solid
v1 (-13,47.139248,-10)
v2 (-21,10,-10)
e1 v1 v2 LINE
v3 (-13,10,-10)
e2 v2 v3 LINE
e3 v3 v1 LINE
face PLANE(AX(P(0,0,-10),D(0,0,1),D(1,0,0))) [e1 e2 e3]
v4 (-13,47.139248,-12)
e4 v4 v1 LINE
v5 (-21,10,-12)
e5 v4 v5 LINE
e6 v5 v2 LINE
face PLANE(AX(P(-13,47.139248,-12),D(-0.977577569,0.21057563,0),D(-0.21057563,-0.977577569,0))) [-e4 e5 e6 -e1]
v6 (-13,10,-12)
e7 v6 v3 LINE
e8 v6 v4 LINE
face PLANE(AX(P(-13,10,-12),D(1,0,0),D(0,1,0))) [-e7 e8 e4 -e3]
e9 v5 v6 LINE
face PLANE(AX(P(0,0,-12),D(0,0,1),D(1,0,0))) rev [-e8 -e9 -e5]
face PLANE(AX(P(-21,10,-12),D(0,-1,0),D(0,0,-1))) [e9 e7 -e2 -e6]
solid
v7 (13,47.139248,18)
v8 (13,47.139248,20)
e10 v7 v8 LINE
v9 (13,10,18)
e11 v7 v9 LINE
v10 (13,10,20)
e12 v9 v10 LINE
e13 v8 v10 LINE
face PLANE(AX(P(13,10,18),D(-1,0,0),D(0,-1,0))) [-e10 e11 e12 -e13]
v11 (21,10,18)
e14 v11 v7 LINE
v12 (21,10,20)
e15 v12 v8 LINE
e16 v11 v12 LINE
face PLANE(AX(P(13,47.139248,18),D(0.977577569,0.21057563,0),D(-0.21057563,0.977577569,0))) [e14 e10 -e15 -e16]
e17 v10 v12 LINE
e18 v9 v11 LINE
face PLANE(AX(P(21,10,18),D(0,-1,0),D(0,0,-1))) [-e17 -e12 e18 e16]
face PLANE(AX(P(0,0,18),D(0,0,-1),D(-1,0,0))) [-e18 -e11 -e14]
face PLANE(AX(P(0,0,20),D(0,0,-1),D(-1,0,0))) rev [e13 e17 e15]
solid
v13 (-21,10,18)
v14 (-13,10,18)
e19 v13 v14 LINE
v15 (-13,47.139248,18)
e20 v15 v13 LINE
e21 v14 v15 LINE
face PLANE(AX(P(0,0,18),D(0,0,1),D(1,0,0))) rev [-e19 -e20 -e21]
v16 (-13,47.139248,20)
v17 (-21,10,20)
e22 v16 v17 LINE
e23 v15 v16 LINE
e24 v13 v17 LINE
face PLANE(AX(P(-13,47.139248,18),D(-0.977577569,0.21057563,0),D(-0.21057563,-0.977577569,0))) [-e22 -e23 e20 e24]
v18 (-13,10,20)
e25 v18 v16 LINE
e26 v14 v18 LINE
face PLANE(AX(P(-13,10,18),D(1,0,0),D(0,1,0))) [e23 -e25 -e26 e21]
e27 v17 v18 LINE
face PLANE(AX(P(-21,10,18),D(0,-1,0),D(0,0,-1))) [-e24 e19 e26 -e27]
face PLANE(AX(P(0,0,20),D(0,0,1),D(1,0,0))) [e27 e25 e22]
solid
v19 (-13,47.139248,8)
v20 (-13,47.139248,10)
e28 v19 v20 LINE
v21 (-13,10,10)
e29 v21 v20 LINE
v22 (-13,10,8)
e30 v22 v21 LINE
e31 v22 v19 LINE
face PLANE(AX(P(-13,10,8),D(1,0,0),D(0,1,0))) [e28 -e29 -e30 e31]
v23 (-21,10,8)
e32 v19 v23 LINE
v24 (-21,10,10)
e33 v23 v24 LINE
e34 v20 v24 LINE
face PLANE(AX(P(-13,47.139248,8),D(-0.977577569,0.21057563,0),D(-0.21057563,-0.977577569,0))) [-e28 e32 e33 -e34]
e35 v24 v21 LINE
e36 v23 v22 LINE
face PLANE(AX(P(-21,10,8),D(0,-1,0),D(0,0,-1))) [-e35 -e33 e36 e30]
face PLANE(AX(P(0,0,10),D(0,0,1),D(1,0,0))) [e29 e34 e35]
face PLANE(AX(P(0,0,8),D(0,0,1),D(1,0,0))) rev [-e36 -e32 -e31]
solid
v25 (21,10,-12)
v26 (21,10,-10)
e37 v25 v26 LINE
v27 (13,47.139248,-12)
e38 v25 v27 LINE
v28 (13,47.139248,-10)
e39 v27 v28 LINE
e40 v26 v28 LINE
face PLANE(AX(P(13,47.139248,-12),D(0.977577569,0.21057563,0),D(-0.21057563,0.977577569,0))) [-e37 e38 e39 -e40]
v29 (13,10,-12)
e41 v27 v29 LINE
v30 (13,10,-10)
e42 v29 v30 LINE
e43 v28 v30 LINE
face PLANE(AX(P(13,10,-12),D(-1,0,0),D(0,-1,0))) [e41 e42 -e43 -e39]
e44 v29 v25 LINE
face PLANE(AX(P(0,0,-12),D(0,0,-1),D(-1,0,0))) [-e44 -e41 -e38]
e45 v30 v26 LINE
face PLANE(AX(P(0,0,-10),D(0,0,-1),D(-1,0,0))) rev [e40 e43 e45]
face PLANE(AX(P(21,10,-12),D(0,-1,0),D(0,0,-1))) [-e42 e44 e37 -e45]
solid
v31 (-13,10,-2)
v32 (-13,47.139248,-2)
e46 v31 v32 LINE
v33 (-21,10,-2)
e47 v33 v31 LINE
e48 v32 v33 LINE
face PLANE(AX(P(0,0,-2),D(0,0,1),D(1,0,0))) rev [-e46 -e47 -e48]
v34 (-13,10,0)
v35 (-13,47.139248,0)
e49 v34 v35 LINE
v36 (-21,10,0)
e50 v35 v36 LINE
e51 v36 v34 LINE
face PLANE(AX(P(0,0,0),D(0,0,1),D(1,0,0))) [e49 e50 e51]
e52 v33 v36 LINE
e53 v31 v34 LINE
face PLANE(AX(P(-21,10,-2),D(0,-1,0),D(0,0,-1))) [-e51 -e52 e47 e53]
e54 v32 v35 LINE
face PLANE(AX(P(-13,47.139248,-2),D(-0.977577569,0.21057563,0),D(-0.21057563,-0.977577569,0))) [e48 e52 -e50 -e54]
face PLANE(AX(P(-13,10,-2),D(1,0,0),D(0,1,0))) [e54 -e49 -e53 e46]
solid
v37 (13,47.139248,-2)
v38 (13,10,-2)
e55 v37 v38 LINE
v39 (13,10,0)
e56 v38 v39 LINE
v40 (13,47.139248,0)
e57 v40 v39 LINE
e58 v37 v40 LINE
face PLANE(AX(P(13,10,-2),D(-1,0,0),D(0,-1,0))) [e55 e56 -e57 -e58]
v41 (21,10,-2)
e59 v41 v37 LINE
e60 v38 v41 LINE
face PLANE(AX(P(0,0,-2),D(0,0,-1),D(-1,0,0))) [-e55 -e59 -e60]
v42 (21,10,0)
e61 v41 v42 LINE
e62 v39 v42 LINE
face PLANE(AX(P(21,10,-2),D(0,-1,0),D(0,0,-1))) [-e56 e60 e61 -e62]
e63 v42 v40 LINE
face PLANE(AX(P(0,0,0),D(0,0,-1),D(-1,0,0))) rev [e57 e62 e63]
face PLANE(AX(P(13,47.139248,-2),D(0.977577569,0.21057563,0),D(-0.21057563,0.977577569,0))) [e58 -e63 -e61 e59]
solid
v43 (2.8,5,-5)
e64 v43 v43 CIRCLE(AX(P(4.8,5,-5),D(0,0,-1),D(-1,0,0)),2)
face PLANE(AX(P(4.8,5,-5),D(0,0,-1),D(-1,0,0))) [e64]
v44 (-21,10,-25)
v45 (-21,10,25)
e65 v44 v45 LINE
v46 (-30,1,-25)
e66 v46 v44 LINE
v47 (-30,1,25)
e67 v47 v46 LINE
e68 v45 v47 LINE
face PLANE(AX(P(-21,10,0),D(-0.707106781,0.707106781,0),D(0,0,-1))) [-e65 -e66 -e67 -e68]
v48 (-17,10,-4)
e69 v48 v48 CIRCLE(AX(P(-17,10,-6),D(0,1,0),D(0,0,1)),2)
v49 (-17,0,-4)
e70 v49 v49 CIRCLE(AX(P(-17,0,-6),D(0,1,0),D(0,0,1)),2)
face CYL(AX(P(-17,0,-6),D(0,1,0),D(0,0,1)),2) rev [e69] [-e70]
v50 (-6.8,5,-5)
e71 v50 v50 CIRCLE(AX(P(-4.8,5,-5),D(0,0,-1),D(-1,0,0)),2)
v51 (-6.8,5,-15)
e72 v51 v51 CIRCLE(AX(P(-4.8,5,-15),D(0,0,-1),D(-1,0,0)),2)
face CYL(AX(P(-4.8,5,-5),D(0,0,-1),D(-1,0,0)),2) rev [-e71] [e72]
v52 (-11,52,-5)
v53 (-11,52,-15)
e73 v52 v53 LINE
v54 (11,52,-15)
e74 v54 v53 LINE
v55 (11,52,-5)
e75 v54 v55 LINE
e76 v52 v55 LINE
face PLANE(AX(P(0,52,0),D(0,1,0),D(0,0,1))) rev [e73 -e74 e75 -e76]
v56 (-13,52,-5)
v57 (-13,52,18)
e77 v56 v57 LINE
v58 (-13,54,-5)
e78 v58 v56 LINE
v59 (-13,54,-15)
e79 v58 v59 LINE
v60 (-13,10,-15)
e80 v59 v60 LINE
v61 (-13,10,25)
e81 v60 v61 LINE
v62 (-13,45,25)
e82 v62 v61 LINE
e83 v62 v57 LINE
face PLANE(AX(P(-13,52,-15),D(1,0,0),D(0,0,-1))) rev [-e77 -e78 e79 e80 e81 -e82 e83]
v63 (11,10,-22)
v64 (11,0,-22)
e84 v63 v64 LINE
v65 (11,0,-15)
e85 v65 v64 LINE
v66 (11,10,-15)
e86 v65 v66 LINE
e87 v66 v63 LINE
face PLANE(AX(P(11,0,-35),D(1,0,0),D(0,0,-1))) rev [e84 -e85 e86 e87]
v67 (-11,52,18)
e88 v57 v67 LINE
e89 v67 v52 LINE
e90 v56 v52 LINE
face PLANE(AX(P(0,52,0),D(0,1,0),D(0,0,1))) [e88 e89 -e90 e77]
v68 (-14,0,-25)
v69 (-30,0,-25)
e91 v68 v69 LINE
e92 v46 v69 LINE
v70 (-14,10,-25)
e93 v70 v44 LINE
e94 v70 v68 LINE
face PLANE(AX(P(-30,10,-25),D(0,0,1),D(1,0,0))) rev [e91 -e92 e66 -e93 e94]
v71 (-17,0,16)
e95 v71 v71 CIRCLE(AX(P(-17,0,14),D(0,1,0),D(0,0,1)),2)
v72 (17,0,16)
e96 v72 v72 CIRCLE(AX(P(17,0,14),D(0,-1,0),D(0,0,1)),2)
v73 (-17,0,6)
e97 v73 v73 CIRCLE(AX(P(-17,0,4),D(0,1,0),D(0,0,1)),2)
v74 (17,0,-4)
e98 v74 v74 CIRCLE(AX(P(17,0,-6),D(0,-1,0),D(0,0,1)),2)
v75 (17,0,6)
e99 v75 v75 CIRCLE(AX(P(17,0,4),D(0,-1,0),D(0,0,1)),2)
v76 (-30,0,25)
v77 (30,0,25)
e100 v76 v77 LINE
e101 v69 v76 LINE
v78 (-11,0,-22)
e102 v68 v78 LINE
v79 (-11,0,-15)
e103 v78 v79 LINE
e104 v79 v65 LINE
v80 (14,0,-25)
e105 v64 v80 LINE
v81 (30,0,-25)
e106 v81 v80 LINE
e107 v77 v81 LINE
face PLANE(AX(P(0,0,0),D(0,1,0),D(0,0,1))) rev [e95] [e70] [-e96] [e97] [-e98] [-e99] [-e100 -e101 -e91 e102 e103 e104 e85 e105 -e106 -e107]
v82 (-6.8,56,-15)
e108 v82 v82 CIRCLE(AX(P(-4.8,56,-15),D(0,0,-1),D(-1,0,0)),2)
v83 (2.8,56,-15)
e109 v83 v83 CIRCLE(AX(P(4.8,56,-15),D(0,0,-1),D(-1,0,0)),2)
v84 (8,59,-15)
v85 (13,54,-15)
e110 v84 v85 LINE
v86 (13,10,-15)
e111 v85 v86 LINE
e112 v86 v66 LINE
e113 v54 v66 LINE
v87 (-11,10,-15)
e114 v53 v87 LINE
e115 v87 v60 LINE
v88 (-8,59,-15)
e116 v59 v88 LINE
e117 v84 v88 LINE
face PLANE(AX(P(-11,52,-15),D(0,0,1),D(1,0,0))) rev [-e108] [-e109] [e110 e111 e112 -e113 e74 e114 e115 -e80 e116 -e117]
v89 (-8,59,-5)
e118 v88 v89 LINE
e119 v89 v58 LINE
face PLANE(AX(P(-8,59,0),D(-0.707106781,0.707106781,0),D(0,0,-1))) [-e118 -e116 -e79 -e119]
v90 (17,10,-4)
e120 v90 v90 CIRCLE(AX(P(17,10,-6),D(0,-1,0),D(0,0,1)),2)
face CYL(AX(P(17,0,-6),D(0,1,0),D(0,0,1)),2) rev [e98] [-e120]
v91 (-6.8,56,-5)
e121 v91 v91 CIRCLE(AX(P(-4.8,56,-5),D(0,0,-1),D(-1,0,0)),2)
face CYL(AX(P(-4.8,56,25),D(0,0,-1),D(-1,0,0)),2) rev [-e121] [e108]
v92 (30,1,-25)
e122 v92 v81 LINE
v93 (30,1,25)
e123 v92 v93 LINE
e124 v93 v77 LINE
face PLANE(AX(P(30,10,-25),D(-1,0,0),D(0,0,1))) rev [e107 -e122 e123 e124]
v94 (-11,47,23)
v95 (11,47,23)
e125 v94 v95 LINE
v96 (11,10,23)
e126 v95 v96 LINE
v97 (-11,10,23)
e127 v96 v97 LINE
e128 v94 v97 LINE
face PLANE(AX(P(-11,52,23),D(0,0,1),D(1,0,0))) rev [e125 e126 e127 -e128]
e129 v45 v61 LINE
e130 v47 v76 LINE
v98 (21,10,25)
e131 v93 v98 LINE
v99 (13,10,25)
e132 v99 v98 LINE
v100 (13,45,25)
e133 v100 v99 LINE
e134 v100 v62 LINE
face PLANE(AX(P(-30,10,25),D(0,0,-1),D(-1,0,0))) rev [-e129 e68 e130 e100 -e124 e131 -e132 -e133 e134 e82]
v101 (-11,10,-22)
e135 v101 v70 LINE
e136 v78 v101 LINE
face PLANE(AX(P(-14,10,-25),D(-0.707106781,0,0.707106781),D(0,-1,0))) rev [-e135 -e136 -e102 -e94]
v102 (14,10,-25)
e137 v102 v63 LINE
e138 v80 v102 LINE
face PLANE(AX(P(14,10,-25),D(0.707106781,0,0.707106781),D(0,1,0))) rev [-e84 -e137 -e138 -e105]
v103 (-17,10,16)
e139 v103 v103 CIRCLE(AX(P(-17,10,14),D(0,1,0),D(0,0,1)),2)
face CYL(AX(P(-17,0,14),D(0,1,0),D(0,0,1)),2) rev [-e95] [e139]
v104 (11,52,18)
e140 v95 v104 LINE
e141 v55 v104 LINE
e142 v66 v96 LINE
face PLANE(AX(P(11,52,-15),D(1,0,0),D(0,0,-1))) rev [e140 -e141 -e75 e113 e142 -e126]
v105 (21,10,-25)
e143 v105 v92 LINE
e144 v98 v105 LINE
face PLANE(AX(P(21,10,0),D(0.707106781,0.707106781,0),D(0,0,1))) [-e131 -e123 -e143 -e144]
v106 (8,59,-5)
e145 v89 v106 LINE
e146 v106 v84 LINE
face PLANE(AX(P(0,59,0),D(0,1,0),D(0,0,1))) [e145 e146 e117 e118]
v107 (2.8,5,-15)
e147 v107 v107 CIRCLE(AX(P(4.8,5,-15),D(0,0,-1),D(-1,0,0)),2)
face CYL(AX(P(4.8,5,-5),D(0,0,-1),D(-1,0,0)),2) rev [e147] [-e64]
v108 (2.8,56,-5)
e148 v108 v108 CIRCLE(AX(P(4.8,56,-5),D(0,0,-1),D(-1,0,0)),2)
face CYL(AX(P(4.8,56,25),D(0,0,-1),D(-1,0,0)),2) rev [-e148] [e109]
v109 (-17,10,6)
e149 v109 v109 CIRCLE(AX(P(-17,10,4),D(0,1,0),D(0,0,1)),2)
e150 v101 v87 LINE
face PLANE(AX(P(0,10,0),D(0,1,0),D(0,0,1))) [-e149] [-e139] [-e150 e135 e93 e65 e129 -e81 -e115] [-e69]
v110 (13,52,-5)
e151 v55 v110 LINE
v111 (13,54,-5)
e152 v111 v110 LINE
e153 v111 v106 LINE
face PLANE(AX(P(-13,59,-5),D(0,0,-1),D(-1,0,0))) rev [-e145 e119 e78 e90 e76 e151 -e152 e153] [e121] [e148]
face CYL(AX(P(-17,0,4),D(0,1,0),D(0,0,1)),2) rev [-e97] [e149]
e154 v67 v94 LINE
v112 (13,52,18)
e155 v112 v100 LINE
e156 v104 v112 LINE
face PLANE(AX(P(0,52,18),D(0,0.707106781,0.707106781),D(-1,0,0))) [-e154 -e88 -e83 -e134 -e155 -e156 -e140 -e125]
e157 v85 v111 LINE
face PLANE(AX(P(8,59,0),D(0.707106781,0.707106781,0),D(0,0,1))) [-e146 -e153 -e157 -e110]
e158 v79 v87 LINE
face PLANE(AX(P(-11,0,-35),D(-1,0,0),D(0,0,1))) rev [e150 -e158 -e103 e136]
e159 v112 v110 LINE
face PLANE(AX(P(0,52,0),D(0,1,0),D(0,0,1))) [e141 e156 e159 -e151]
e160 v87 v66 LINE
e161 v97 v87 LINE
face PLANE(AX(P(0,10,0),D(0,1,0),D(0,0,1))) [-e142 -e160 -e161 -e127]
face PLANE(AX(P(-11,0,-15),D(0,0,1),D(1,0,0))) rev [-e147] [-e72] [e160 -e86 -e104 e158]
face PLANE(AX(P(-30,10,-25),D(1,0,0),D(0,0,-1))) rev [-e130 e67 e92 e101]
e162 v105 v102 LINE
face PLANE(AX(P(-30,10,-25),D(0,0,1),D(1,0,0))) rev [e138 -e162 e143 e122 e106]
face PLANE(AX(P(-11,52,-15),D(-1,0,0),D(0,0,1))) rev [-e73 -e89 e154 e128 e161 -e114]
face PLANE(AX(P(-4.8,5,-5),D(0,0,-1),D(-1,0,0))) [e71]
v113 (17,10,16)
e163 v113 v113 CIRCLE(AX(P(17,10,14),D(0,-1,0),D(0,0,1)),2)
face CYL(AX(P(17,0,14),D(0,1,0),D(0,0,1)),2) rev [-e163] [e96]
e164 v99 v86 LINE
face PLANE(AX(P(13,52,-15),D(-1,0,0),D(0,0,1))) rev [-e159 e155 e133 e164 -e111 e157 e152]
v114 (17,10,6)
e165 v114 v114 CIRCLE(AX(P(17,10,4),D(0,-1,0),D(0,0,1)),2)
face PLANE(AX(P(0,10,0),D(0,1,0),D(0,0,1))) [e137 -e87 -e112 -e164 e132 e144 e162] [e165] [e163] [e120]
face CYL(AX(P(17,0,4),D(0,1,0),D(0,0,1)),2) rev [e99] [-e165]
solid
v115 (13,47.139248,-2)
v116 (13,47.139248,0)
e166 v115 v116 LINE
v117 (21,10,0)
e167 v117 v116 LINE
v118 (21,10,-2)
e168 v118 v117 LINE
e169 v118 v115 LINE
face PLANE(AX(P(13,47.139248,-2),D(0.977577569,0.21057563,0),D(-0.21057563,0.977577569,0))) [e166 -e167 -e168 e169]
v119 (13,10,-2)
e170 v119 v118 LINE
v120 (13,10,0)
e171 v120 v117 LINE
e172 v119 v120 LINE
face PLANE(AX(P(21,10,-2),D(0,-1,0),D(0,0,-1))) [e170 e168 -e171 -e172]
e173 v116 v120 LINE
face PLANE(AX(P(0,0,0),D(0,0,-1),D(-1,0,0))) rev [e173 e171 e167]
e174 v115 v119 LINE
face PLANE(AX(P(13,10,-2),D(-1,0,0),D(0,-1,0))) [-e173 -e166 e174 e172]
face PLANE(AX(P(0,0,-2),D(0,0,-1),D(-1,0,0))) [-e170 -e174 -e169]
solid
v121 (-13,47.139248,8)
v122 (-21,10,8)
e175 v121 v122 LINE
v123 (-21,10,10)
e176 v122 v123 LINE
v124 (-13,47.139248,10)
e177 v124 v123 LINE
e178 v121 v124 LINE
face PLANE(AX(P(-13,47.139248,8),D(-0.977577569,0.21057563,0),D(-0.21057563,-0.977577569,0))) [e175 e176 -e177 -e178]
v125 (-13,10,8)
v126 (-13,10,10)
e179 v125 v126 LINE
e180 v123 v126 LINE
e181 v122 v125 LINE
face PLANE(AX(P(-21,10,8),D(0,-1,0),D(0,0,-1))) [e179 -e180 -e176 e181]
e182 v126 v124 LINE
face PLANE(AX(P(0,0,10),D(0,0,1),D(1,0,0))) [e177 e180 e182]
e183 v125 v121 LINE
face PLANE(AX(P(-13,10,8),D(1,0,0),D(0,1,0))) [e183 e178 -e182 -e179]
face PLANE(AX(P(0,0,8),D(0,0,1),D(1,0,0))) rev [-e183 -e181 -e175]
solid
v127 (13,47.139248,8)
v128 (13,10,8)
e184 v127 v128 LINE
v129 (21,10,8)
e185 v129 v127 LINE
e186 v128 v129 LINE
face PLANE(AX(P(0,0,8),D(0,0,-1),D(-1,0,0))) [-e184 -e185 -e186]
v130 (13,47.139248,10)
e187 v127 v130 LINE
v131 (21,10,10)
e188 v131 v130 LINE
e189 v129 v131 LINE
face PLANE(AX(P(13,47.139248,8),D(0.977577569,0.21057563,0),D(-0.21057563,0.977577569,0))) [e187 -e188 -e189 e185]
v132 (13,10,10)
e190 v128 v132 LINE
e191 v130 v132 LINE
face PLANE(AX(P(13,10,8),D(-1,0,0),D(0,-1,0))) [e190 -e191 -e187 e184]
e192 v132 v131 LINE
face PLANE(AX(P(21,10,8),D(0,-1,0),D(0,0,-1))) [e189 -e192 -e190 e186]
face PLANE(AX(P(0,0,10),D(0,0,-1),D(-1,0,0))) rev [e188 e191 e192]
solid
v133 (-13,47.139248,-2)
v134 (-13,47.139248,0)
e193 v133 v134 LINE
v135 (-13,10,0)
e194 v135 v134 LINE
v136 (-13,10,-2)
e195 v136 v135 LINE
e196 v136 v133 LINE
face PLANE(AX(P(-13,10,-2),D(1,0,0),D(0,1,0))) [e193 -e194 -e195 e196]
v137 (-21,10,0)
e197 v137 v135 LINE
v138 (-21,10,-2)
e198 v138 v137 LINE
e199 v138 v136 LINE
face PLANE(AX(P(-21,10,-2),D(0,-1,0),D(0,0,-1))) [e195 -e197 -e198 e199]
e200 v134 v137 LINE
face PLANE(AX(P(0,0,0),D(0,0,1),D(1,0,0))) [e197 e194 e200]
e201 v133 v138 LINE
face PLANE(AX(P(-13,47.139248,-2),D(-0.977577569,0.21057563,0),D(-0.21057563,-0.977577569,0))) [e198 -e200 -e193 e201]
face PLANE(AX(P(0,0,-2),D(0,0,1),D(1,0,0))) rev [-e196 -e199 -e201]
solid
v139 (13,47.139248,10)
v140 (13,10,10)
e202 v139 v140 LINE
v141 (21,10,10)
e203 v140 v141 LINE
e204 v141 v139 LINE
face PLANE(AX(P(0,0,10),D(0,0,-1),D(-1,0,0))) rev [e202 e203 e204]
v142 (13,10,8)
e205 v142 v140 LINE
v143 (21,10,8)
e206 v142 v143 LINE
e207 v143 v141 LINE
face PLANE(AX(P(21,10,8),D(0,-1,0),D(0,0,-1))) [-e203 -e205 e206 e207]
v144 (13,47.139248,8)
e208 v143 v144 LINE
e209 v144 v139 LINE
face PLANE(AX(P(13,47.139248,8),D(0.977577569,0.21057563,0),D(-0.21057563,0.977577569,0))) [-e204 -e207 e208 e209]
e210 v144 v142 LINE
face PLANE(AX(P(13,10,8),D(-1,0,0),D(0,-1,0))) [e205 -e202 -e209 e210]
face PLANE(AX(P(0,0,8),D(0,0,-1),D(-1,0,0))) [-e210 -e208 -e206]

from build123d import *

# Parameters (mm, degrees)
SKETCH1_W                 = 60
SKETCH1_H                 = 50
BOSS_EXTRUDE1_DEPTH       = 10
CHAMFER1_SIZE             = 9
SKETCH2_W                 = 22
SKETCH2_H                 = 20
CUT_EXTRUDE1_DEPTH        = 41.311288741
CHAMFER2_SIZE             = 3
SKETCH3_R                 = 2
CUT_EXTRUDE2_DEPTH        = 10
BOSS_EXTRUDE2_DEPTH       = 42
BOSS_EXTRUDE3_DEPTH       = 2
BOSS_EXTRUDE3_2_DEPTH     = 2
LPATTERN1_START           = 8
LPATTERN1_DEPTH           = 2
LPATTERN1_2_DEPTH         = 2
LPATTERN1_START_2         = 18
LPATTERN1_3_DEPTH         = 2
LPATTERN1_4_DEPTH         = 2
LPATTERN1_5_DEPTH         = 2
LPATTERN1_6_DEPTH         = 2
LPATTERN1_START_3         = -12
LPATTERN1_7_DEPTH         = 2
LPATTERN1_8_DEPTH         = 2
LPATTERN1_START_4         = -2
LPATTERN1_9_DEPTH         = 2
LPATTERN1_10_DEPTH        = 2
SKETCH6_W                 = 26
SKETCH6_H                 = 10
BOSS_EXTRUDE4_DEPTH       = 7
CHAMFER5_SIZE             = 7
SKETCH10_R                = 2
CUT_EXTRUDE4_DEPTH        = 78.336925204
CHAMFER6_SIZE             = 5
SKETCH11_R                = 2
CUT_EXTRUDE5_DEPTH        = 63.657800791
LPATTERN2_COUNT           = 3
LPATTERN2_PITCH           = 10
LPATTERN2_COPY_1_SKETCH_R = 2
LPATTERN2_COPY_1_DEPTH    = 63.657800791
LPATTERN2_COPY_2_SKETCH_R = 2
LPATTERN2_COPY_2_DEPTH    = 63.657800791


# Read off the part's stored shape, not the designer's step: LPattern1
with BuildPart() as part:
    # Sketch1 → Boss-Extrude1 (new body)
    with BuildSketch(Plane(origin=(0, 0, 0), x_dir=(1, 0, 0), z_dir=(0, 1, 0))):
        Rectangle(SKETCH1_W, SKETCH1_H)
    extrude(amount=BOSS_EXTRUDE1_DEPTH)

    # Chamfer1
    chamfer1_edges = [part.edges().sort_by_distance(p)[0] for p in [
        (-30, 10, 0),
        (30, 10, 0),
    ]]
    chamfer(chamfer1_edges, length=CHAMFER1_SIZE)

    # Sketch2 → Cut-Extrude1 (cut, through all)
    with BuildSketch(Plane(origin=(0, 10, 0), x_dir=(1, 0, 0), z_dir=(0, 1, 0))):
        with Locations((0, 25)):
            Rectangle(SKETCH2_W, SKETCH2_H)
    extrude(amount=-CUT_EXTRUDE1_DEPTH, mode=Mode.SUBTRACT)

    # Chamfer2
    chamfer2_edges = [part.edges().sort_by_distance(p)[0] for p in [
        (11, 5, -25),
        (-11, 5, -25),
    ]]
    chamfer(chamfer2_edges, length=CHAMFER2_SIZE)

    # Sketch3 → Cut-Extrude2 (cut)
    with BuildSketch(Plane(origin=(0, 0, -15), x_dir=(-1, 0, 0), z_dir=(0, 0, -1))):
        with Locations((-4.8, 5)):
            Circle(SKETCH3_R)
        with Locations((4.8, 5)):
            Circle(SKETCH3_R)
    extrude(amount=-CUT_EXTRUDE2_DEPTH, mode=Mode.SUBTRACT)

    # Sketch4 → Boss-Extrude2 (add)
    with BuildSketch(Plane(origin=(0, 10, 0), x_dir=(1, 0, 0), z_dir=(0, 1, 0))):
        Polygon((-11, 15), (-13, 15), (-13, -25), (-11, -25), (11, -25), (13, -25), (13, 15), (11, 15), (11, -23), (-11, -23), align=None)
    extrude(amount=BOSS_EXTRUDE2_DEPTH)

    # Sketch6 → Boss-Extrude4 (add)
    with BuildSketch(Plane(origin=(0, 52, 0), x_dir=(1, 0, 0), z_dir=(0, 1, 0))):
        with Locations((0, 10)):
            Rectangle(SKETCH6_W, SKETCH6_H)
    extrude(amount=BOSS_EXTRUDE4_DEPTH)

    # Chamfer5
    # the kernel refuses this chamfer: 7 mm, written as the material it takes off along each edge
    with BuildSketch(Plane(origin=(31.001780916, 52, 25), x_dir=(0, -0.9996219169112968, 0.02749587661058662), z_dir=(-1, 0, 0))) as chamfer5_piece_1:
        Polygon((CHAMFER5_SIZE * 0.999621916911, -CHAMFER5_SIZE * 0.0274958766106), (-CHAMFER5_SIZE * 0.0274958766106, -CHAMFER5_SIZE * 0.999621916911), (0, 0), align=None)
    extrude(amount=62.003561832, mode=Mode.SUBTRACT)

    # Sketch10 → Cut-Extrude4 (cut, through all)
    with BuildSketch(Plane(origin=(0, 0, -15), x_dir=(-1, 0, 0), z_dir=(0, 0, -1))):
        with Locations((-4.8, 56)):
            Circle(SKETCH10_R)
        with Locations((4.8, 56)):
            Circle(SKETCH10_R)
    extrude(amount=-CUT_EXTRUDE4_DEPTH, mode=Mode.SUBTRACT)

    # Chamfer6
    chamfer6_edges = [part.edges().sort_by_distance(p)[0] for p in [
        (-13, 59, -10),
        (13, 59, -10),
    ]]
    chamfer(chamfer6_edges, length=CHAMFER6_SIZE)

    # Sketch11 → Cut-Extrude5 (cut, through all)
    with BuildSketch(Plane(origin=(0, 10, 0), x_dir=(1, 0, 0), z_dir=(0, 1, 0))):
        with Locations(Location((-17, -14, 0), (0, 0, 270))):
            Circle(SKETCH11_R)
    cut_extrude5 = extrude(amount=-CUT_EXTRUDE5_DEPTH, mode=Mode.SUBTRACT)

    # Mirror4: Cut-Extrude5 across plane
    add(cut_extrude5.mirror(Plane(origin=(0, 0, 0), x_dir=(0, 0, 1), z_dir=(1, 0, 0))), mode=Mode.SUBTRACT)

    # LPattern2: Cut-Extrude5 ×3
    with Locations(*[(0, 0, -i * LPATTERN2_PITCH) for i in range(1, LPATTERN2_COUNT)]):
        add(cut_extrude5, mode=Mode.SUBTRACT)

    # LPattern2 copy 1 sketch → LPattern2 copy 1 (cut, through all)
    with BuildSketch(Plane(origin=(0, 10, -10), x_dir=(-1, 0, 0), z_dir=(0, 1, 0))):
        with Locations((-17, 14)):
            Circle(LPATTERN2_COPY_1_SKETCH_R)
    extrude(amount=-LPATTERN2_COPY_1_DEPTH, mode=Mode.SUBTRACT)

    # LPattern2 copy 2 sketch → LPattern2 copy 2 (cut, through all)
    with BuildSketch(Plane(origin=(0, 10, -20), x_dir=(-1, 0, 0), z_dir=(0, 1, 0))):
        with Locations((-17, 14)):
            Circle(LPATTERN2_COPY_2_SKETCH_R)
    extrude(amount=-LPATTERN2_COPY_2_DEPTH, mode=Mode.SUBTRACT)


with BuildPart() as body_2:
    # Sketch5 → Boss-Extrude3 (new body)
    with BuildSketch(Plane.XY):
        Polygon((21, 10), (13, 10), (13, 47.139248054), align=None)
    extrude(amount=-BOSS_EXTRUDE3_DEPTH)


with BuildPart() as body_3:
    # Sketch5 → Boss-Extrude3 2 (new body)
    with BuildSketch(Plane.XY):
        Polygon((-21, 10), (-13, 10), (-13, 47.139248054), align=None)
    extrude(amount=-BOSS_EXTRUDE3_2_DEPTH)


with BuildPart() as body_4:
    # LPattern1 outline → LPattern1 (new body)
    with BuildSketch(Plane.XY.offset(LPATTERN1_START)):
        Polygon((-13, 10), (-13, 47.139248054), (-21, 10), align=None)
    extrude(amount=LPATTERN1_DEPTH)


with BuildPart() as body_5:
    # LPattern1 2 outline → LPattern1 2 (new body)
    with BuildSketch(Plane.XY.offset(LPATTERN1_START)):
        Polygon((13, 10), (21, 10), (13, 47.139248054), align=None)
    extrude(amount=LPATTERN1_2_DEPTH)


with BuildPart() as body_6:
    # LPattern1 3 outline → LPattern1 3 (new body)
    with BuildSketch(Plane.XY.offset(LPATTERN1_START_2)):
        Polygon((-13, 10), (-13, 47.139248054), (-21, 10), align=None)
    extrude(amount=LPATTERN1_3_DEPTH)


with BuildPart() as body_7:
    # LPattern1 4 outline → LPattern1 4 (new body)
    with BuildSketch(Plane.XY.offset(LPATTERN1_START_2)):
        Polygon((13, 10), (21, 10), (13, 47.139248054), align=None)
    extrude(amount=LPATTERN1_4_DEPTH)


with BuildPart() as body_8:
    # LPattern1 5 outline → LPattern1 5 (new body)
    with BuildSketch(Plane.XY.offset(LPATTERN1_START)):
        Polygon((-13, 10), (-13, 47.139248054), (-21, 10), align=None)
    extrude(amount=LPATTERN1_5_DEPTH)


with BuildPart() as body_9:
    # LPattern1 6 outline → LPattern1 6 (new body)
    with BuildSketch(Plane.XY.offset(LPATTERN1_START)):
        Polygon((13, 10), (21, 10), (13, 47.139248054), align=None)
    extrude(amount=LPATTERN1_6_DEPTH)


with BuildPart() as body_10:
    # LPattern1 7 outline → LPattern1 7 (new body)
    with BuildSketch(Plane.XY.offset(LPATTERN1_START_3)):
        Polygon((-13, 10), (-13, 47.139248054), (-21, 10), align=None)
    extrude(amount=LPATTERN1_7_DEPTH)


with BuildPart() as body_11:
    # LPattern1 8 outline → LPattern1 8 (new body)
    with BuildSketch(Plane.XY.offset(LPATTERN1_START_3)):
        Polygon((13, 10), (21, 10), (13, 47.139248054), align=None)
    extrude(amount=LPATTERN1_8_DEPTH)


with BuildPart() as body_12:
    # LPattern1 9 outline → LPattern1 9 (new body)
    with BuildSketch(Plane.XY.offset(LPATTERN1_START_4)):
        Polygon((-13, 10), (-13, 47.139248054), (-21, 10), align=None)
    extrude(amount=LPATTERN1_9_DEPTH)


with BuildPart() as body_13:
    # LPattern1 10 outline → LPattern1 10 (new body)
    with BuildSketch(Plane.XY.offset(LPATTERN1_START_4)):
        Polygon((13, 10), (21, 10), (13, 47.139248054), align=None)
    extrude(amount=LPATTERN1_10_DEPTH)


solid = Compound([part.part, body_2.part, body_3.part, body_4.part, body_5.part, body_6.part, body_7.part, body_8.part, body_9.part, body_10.part, body_11.part, body_12.part, body_13.part])
